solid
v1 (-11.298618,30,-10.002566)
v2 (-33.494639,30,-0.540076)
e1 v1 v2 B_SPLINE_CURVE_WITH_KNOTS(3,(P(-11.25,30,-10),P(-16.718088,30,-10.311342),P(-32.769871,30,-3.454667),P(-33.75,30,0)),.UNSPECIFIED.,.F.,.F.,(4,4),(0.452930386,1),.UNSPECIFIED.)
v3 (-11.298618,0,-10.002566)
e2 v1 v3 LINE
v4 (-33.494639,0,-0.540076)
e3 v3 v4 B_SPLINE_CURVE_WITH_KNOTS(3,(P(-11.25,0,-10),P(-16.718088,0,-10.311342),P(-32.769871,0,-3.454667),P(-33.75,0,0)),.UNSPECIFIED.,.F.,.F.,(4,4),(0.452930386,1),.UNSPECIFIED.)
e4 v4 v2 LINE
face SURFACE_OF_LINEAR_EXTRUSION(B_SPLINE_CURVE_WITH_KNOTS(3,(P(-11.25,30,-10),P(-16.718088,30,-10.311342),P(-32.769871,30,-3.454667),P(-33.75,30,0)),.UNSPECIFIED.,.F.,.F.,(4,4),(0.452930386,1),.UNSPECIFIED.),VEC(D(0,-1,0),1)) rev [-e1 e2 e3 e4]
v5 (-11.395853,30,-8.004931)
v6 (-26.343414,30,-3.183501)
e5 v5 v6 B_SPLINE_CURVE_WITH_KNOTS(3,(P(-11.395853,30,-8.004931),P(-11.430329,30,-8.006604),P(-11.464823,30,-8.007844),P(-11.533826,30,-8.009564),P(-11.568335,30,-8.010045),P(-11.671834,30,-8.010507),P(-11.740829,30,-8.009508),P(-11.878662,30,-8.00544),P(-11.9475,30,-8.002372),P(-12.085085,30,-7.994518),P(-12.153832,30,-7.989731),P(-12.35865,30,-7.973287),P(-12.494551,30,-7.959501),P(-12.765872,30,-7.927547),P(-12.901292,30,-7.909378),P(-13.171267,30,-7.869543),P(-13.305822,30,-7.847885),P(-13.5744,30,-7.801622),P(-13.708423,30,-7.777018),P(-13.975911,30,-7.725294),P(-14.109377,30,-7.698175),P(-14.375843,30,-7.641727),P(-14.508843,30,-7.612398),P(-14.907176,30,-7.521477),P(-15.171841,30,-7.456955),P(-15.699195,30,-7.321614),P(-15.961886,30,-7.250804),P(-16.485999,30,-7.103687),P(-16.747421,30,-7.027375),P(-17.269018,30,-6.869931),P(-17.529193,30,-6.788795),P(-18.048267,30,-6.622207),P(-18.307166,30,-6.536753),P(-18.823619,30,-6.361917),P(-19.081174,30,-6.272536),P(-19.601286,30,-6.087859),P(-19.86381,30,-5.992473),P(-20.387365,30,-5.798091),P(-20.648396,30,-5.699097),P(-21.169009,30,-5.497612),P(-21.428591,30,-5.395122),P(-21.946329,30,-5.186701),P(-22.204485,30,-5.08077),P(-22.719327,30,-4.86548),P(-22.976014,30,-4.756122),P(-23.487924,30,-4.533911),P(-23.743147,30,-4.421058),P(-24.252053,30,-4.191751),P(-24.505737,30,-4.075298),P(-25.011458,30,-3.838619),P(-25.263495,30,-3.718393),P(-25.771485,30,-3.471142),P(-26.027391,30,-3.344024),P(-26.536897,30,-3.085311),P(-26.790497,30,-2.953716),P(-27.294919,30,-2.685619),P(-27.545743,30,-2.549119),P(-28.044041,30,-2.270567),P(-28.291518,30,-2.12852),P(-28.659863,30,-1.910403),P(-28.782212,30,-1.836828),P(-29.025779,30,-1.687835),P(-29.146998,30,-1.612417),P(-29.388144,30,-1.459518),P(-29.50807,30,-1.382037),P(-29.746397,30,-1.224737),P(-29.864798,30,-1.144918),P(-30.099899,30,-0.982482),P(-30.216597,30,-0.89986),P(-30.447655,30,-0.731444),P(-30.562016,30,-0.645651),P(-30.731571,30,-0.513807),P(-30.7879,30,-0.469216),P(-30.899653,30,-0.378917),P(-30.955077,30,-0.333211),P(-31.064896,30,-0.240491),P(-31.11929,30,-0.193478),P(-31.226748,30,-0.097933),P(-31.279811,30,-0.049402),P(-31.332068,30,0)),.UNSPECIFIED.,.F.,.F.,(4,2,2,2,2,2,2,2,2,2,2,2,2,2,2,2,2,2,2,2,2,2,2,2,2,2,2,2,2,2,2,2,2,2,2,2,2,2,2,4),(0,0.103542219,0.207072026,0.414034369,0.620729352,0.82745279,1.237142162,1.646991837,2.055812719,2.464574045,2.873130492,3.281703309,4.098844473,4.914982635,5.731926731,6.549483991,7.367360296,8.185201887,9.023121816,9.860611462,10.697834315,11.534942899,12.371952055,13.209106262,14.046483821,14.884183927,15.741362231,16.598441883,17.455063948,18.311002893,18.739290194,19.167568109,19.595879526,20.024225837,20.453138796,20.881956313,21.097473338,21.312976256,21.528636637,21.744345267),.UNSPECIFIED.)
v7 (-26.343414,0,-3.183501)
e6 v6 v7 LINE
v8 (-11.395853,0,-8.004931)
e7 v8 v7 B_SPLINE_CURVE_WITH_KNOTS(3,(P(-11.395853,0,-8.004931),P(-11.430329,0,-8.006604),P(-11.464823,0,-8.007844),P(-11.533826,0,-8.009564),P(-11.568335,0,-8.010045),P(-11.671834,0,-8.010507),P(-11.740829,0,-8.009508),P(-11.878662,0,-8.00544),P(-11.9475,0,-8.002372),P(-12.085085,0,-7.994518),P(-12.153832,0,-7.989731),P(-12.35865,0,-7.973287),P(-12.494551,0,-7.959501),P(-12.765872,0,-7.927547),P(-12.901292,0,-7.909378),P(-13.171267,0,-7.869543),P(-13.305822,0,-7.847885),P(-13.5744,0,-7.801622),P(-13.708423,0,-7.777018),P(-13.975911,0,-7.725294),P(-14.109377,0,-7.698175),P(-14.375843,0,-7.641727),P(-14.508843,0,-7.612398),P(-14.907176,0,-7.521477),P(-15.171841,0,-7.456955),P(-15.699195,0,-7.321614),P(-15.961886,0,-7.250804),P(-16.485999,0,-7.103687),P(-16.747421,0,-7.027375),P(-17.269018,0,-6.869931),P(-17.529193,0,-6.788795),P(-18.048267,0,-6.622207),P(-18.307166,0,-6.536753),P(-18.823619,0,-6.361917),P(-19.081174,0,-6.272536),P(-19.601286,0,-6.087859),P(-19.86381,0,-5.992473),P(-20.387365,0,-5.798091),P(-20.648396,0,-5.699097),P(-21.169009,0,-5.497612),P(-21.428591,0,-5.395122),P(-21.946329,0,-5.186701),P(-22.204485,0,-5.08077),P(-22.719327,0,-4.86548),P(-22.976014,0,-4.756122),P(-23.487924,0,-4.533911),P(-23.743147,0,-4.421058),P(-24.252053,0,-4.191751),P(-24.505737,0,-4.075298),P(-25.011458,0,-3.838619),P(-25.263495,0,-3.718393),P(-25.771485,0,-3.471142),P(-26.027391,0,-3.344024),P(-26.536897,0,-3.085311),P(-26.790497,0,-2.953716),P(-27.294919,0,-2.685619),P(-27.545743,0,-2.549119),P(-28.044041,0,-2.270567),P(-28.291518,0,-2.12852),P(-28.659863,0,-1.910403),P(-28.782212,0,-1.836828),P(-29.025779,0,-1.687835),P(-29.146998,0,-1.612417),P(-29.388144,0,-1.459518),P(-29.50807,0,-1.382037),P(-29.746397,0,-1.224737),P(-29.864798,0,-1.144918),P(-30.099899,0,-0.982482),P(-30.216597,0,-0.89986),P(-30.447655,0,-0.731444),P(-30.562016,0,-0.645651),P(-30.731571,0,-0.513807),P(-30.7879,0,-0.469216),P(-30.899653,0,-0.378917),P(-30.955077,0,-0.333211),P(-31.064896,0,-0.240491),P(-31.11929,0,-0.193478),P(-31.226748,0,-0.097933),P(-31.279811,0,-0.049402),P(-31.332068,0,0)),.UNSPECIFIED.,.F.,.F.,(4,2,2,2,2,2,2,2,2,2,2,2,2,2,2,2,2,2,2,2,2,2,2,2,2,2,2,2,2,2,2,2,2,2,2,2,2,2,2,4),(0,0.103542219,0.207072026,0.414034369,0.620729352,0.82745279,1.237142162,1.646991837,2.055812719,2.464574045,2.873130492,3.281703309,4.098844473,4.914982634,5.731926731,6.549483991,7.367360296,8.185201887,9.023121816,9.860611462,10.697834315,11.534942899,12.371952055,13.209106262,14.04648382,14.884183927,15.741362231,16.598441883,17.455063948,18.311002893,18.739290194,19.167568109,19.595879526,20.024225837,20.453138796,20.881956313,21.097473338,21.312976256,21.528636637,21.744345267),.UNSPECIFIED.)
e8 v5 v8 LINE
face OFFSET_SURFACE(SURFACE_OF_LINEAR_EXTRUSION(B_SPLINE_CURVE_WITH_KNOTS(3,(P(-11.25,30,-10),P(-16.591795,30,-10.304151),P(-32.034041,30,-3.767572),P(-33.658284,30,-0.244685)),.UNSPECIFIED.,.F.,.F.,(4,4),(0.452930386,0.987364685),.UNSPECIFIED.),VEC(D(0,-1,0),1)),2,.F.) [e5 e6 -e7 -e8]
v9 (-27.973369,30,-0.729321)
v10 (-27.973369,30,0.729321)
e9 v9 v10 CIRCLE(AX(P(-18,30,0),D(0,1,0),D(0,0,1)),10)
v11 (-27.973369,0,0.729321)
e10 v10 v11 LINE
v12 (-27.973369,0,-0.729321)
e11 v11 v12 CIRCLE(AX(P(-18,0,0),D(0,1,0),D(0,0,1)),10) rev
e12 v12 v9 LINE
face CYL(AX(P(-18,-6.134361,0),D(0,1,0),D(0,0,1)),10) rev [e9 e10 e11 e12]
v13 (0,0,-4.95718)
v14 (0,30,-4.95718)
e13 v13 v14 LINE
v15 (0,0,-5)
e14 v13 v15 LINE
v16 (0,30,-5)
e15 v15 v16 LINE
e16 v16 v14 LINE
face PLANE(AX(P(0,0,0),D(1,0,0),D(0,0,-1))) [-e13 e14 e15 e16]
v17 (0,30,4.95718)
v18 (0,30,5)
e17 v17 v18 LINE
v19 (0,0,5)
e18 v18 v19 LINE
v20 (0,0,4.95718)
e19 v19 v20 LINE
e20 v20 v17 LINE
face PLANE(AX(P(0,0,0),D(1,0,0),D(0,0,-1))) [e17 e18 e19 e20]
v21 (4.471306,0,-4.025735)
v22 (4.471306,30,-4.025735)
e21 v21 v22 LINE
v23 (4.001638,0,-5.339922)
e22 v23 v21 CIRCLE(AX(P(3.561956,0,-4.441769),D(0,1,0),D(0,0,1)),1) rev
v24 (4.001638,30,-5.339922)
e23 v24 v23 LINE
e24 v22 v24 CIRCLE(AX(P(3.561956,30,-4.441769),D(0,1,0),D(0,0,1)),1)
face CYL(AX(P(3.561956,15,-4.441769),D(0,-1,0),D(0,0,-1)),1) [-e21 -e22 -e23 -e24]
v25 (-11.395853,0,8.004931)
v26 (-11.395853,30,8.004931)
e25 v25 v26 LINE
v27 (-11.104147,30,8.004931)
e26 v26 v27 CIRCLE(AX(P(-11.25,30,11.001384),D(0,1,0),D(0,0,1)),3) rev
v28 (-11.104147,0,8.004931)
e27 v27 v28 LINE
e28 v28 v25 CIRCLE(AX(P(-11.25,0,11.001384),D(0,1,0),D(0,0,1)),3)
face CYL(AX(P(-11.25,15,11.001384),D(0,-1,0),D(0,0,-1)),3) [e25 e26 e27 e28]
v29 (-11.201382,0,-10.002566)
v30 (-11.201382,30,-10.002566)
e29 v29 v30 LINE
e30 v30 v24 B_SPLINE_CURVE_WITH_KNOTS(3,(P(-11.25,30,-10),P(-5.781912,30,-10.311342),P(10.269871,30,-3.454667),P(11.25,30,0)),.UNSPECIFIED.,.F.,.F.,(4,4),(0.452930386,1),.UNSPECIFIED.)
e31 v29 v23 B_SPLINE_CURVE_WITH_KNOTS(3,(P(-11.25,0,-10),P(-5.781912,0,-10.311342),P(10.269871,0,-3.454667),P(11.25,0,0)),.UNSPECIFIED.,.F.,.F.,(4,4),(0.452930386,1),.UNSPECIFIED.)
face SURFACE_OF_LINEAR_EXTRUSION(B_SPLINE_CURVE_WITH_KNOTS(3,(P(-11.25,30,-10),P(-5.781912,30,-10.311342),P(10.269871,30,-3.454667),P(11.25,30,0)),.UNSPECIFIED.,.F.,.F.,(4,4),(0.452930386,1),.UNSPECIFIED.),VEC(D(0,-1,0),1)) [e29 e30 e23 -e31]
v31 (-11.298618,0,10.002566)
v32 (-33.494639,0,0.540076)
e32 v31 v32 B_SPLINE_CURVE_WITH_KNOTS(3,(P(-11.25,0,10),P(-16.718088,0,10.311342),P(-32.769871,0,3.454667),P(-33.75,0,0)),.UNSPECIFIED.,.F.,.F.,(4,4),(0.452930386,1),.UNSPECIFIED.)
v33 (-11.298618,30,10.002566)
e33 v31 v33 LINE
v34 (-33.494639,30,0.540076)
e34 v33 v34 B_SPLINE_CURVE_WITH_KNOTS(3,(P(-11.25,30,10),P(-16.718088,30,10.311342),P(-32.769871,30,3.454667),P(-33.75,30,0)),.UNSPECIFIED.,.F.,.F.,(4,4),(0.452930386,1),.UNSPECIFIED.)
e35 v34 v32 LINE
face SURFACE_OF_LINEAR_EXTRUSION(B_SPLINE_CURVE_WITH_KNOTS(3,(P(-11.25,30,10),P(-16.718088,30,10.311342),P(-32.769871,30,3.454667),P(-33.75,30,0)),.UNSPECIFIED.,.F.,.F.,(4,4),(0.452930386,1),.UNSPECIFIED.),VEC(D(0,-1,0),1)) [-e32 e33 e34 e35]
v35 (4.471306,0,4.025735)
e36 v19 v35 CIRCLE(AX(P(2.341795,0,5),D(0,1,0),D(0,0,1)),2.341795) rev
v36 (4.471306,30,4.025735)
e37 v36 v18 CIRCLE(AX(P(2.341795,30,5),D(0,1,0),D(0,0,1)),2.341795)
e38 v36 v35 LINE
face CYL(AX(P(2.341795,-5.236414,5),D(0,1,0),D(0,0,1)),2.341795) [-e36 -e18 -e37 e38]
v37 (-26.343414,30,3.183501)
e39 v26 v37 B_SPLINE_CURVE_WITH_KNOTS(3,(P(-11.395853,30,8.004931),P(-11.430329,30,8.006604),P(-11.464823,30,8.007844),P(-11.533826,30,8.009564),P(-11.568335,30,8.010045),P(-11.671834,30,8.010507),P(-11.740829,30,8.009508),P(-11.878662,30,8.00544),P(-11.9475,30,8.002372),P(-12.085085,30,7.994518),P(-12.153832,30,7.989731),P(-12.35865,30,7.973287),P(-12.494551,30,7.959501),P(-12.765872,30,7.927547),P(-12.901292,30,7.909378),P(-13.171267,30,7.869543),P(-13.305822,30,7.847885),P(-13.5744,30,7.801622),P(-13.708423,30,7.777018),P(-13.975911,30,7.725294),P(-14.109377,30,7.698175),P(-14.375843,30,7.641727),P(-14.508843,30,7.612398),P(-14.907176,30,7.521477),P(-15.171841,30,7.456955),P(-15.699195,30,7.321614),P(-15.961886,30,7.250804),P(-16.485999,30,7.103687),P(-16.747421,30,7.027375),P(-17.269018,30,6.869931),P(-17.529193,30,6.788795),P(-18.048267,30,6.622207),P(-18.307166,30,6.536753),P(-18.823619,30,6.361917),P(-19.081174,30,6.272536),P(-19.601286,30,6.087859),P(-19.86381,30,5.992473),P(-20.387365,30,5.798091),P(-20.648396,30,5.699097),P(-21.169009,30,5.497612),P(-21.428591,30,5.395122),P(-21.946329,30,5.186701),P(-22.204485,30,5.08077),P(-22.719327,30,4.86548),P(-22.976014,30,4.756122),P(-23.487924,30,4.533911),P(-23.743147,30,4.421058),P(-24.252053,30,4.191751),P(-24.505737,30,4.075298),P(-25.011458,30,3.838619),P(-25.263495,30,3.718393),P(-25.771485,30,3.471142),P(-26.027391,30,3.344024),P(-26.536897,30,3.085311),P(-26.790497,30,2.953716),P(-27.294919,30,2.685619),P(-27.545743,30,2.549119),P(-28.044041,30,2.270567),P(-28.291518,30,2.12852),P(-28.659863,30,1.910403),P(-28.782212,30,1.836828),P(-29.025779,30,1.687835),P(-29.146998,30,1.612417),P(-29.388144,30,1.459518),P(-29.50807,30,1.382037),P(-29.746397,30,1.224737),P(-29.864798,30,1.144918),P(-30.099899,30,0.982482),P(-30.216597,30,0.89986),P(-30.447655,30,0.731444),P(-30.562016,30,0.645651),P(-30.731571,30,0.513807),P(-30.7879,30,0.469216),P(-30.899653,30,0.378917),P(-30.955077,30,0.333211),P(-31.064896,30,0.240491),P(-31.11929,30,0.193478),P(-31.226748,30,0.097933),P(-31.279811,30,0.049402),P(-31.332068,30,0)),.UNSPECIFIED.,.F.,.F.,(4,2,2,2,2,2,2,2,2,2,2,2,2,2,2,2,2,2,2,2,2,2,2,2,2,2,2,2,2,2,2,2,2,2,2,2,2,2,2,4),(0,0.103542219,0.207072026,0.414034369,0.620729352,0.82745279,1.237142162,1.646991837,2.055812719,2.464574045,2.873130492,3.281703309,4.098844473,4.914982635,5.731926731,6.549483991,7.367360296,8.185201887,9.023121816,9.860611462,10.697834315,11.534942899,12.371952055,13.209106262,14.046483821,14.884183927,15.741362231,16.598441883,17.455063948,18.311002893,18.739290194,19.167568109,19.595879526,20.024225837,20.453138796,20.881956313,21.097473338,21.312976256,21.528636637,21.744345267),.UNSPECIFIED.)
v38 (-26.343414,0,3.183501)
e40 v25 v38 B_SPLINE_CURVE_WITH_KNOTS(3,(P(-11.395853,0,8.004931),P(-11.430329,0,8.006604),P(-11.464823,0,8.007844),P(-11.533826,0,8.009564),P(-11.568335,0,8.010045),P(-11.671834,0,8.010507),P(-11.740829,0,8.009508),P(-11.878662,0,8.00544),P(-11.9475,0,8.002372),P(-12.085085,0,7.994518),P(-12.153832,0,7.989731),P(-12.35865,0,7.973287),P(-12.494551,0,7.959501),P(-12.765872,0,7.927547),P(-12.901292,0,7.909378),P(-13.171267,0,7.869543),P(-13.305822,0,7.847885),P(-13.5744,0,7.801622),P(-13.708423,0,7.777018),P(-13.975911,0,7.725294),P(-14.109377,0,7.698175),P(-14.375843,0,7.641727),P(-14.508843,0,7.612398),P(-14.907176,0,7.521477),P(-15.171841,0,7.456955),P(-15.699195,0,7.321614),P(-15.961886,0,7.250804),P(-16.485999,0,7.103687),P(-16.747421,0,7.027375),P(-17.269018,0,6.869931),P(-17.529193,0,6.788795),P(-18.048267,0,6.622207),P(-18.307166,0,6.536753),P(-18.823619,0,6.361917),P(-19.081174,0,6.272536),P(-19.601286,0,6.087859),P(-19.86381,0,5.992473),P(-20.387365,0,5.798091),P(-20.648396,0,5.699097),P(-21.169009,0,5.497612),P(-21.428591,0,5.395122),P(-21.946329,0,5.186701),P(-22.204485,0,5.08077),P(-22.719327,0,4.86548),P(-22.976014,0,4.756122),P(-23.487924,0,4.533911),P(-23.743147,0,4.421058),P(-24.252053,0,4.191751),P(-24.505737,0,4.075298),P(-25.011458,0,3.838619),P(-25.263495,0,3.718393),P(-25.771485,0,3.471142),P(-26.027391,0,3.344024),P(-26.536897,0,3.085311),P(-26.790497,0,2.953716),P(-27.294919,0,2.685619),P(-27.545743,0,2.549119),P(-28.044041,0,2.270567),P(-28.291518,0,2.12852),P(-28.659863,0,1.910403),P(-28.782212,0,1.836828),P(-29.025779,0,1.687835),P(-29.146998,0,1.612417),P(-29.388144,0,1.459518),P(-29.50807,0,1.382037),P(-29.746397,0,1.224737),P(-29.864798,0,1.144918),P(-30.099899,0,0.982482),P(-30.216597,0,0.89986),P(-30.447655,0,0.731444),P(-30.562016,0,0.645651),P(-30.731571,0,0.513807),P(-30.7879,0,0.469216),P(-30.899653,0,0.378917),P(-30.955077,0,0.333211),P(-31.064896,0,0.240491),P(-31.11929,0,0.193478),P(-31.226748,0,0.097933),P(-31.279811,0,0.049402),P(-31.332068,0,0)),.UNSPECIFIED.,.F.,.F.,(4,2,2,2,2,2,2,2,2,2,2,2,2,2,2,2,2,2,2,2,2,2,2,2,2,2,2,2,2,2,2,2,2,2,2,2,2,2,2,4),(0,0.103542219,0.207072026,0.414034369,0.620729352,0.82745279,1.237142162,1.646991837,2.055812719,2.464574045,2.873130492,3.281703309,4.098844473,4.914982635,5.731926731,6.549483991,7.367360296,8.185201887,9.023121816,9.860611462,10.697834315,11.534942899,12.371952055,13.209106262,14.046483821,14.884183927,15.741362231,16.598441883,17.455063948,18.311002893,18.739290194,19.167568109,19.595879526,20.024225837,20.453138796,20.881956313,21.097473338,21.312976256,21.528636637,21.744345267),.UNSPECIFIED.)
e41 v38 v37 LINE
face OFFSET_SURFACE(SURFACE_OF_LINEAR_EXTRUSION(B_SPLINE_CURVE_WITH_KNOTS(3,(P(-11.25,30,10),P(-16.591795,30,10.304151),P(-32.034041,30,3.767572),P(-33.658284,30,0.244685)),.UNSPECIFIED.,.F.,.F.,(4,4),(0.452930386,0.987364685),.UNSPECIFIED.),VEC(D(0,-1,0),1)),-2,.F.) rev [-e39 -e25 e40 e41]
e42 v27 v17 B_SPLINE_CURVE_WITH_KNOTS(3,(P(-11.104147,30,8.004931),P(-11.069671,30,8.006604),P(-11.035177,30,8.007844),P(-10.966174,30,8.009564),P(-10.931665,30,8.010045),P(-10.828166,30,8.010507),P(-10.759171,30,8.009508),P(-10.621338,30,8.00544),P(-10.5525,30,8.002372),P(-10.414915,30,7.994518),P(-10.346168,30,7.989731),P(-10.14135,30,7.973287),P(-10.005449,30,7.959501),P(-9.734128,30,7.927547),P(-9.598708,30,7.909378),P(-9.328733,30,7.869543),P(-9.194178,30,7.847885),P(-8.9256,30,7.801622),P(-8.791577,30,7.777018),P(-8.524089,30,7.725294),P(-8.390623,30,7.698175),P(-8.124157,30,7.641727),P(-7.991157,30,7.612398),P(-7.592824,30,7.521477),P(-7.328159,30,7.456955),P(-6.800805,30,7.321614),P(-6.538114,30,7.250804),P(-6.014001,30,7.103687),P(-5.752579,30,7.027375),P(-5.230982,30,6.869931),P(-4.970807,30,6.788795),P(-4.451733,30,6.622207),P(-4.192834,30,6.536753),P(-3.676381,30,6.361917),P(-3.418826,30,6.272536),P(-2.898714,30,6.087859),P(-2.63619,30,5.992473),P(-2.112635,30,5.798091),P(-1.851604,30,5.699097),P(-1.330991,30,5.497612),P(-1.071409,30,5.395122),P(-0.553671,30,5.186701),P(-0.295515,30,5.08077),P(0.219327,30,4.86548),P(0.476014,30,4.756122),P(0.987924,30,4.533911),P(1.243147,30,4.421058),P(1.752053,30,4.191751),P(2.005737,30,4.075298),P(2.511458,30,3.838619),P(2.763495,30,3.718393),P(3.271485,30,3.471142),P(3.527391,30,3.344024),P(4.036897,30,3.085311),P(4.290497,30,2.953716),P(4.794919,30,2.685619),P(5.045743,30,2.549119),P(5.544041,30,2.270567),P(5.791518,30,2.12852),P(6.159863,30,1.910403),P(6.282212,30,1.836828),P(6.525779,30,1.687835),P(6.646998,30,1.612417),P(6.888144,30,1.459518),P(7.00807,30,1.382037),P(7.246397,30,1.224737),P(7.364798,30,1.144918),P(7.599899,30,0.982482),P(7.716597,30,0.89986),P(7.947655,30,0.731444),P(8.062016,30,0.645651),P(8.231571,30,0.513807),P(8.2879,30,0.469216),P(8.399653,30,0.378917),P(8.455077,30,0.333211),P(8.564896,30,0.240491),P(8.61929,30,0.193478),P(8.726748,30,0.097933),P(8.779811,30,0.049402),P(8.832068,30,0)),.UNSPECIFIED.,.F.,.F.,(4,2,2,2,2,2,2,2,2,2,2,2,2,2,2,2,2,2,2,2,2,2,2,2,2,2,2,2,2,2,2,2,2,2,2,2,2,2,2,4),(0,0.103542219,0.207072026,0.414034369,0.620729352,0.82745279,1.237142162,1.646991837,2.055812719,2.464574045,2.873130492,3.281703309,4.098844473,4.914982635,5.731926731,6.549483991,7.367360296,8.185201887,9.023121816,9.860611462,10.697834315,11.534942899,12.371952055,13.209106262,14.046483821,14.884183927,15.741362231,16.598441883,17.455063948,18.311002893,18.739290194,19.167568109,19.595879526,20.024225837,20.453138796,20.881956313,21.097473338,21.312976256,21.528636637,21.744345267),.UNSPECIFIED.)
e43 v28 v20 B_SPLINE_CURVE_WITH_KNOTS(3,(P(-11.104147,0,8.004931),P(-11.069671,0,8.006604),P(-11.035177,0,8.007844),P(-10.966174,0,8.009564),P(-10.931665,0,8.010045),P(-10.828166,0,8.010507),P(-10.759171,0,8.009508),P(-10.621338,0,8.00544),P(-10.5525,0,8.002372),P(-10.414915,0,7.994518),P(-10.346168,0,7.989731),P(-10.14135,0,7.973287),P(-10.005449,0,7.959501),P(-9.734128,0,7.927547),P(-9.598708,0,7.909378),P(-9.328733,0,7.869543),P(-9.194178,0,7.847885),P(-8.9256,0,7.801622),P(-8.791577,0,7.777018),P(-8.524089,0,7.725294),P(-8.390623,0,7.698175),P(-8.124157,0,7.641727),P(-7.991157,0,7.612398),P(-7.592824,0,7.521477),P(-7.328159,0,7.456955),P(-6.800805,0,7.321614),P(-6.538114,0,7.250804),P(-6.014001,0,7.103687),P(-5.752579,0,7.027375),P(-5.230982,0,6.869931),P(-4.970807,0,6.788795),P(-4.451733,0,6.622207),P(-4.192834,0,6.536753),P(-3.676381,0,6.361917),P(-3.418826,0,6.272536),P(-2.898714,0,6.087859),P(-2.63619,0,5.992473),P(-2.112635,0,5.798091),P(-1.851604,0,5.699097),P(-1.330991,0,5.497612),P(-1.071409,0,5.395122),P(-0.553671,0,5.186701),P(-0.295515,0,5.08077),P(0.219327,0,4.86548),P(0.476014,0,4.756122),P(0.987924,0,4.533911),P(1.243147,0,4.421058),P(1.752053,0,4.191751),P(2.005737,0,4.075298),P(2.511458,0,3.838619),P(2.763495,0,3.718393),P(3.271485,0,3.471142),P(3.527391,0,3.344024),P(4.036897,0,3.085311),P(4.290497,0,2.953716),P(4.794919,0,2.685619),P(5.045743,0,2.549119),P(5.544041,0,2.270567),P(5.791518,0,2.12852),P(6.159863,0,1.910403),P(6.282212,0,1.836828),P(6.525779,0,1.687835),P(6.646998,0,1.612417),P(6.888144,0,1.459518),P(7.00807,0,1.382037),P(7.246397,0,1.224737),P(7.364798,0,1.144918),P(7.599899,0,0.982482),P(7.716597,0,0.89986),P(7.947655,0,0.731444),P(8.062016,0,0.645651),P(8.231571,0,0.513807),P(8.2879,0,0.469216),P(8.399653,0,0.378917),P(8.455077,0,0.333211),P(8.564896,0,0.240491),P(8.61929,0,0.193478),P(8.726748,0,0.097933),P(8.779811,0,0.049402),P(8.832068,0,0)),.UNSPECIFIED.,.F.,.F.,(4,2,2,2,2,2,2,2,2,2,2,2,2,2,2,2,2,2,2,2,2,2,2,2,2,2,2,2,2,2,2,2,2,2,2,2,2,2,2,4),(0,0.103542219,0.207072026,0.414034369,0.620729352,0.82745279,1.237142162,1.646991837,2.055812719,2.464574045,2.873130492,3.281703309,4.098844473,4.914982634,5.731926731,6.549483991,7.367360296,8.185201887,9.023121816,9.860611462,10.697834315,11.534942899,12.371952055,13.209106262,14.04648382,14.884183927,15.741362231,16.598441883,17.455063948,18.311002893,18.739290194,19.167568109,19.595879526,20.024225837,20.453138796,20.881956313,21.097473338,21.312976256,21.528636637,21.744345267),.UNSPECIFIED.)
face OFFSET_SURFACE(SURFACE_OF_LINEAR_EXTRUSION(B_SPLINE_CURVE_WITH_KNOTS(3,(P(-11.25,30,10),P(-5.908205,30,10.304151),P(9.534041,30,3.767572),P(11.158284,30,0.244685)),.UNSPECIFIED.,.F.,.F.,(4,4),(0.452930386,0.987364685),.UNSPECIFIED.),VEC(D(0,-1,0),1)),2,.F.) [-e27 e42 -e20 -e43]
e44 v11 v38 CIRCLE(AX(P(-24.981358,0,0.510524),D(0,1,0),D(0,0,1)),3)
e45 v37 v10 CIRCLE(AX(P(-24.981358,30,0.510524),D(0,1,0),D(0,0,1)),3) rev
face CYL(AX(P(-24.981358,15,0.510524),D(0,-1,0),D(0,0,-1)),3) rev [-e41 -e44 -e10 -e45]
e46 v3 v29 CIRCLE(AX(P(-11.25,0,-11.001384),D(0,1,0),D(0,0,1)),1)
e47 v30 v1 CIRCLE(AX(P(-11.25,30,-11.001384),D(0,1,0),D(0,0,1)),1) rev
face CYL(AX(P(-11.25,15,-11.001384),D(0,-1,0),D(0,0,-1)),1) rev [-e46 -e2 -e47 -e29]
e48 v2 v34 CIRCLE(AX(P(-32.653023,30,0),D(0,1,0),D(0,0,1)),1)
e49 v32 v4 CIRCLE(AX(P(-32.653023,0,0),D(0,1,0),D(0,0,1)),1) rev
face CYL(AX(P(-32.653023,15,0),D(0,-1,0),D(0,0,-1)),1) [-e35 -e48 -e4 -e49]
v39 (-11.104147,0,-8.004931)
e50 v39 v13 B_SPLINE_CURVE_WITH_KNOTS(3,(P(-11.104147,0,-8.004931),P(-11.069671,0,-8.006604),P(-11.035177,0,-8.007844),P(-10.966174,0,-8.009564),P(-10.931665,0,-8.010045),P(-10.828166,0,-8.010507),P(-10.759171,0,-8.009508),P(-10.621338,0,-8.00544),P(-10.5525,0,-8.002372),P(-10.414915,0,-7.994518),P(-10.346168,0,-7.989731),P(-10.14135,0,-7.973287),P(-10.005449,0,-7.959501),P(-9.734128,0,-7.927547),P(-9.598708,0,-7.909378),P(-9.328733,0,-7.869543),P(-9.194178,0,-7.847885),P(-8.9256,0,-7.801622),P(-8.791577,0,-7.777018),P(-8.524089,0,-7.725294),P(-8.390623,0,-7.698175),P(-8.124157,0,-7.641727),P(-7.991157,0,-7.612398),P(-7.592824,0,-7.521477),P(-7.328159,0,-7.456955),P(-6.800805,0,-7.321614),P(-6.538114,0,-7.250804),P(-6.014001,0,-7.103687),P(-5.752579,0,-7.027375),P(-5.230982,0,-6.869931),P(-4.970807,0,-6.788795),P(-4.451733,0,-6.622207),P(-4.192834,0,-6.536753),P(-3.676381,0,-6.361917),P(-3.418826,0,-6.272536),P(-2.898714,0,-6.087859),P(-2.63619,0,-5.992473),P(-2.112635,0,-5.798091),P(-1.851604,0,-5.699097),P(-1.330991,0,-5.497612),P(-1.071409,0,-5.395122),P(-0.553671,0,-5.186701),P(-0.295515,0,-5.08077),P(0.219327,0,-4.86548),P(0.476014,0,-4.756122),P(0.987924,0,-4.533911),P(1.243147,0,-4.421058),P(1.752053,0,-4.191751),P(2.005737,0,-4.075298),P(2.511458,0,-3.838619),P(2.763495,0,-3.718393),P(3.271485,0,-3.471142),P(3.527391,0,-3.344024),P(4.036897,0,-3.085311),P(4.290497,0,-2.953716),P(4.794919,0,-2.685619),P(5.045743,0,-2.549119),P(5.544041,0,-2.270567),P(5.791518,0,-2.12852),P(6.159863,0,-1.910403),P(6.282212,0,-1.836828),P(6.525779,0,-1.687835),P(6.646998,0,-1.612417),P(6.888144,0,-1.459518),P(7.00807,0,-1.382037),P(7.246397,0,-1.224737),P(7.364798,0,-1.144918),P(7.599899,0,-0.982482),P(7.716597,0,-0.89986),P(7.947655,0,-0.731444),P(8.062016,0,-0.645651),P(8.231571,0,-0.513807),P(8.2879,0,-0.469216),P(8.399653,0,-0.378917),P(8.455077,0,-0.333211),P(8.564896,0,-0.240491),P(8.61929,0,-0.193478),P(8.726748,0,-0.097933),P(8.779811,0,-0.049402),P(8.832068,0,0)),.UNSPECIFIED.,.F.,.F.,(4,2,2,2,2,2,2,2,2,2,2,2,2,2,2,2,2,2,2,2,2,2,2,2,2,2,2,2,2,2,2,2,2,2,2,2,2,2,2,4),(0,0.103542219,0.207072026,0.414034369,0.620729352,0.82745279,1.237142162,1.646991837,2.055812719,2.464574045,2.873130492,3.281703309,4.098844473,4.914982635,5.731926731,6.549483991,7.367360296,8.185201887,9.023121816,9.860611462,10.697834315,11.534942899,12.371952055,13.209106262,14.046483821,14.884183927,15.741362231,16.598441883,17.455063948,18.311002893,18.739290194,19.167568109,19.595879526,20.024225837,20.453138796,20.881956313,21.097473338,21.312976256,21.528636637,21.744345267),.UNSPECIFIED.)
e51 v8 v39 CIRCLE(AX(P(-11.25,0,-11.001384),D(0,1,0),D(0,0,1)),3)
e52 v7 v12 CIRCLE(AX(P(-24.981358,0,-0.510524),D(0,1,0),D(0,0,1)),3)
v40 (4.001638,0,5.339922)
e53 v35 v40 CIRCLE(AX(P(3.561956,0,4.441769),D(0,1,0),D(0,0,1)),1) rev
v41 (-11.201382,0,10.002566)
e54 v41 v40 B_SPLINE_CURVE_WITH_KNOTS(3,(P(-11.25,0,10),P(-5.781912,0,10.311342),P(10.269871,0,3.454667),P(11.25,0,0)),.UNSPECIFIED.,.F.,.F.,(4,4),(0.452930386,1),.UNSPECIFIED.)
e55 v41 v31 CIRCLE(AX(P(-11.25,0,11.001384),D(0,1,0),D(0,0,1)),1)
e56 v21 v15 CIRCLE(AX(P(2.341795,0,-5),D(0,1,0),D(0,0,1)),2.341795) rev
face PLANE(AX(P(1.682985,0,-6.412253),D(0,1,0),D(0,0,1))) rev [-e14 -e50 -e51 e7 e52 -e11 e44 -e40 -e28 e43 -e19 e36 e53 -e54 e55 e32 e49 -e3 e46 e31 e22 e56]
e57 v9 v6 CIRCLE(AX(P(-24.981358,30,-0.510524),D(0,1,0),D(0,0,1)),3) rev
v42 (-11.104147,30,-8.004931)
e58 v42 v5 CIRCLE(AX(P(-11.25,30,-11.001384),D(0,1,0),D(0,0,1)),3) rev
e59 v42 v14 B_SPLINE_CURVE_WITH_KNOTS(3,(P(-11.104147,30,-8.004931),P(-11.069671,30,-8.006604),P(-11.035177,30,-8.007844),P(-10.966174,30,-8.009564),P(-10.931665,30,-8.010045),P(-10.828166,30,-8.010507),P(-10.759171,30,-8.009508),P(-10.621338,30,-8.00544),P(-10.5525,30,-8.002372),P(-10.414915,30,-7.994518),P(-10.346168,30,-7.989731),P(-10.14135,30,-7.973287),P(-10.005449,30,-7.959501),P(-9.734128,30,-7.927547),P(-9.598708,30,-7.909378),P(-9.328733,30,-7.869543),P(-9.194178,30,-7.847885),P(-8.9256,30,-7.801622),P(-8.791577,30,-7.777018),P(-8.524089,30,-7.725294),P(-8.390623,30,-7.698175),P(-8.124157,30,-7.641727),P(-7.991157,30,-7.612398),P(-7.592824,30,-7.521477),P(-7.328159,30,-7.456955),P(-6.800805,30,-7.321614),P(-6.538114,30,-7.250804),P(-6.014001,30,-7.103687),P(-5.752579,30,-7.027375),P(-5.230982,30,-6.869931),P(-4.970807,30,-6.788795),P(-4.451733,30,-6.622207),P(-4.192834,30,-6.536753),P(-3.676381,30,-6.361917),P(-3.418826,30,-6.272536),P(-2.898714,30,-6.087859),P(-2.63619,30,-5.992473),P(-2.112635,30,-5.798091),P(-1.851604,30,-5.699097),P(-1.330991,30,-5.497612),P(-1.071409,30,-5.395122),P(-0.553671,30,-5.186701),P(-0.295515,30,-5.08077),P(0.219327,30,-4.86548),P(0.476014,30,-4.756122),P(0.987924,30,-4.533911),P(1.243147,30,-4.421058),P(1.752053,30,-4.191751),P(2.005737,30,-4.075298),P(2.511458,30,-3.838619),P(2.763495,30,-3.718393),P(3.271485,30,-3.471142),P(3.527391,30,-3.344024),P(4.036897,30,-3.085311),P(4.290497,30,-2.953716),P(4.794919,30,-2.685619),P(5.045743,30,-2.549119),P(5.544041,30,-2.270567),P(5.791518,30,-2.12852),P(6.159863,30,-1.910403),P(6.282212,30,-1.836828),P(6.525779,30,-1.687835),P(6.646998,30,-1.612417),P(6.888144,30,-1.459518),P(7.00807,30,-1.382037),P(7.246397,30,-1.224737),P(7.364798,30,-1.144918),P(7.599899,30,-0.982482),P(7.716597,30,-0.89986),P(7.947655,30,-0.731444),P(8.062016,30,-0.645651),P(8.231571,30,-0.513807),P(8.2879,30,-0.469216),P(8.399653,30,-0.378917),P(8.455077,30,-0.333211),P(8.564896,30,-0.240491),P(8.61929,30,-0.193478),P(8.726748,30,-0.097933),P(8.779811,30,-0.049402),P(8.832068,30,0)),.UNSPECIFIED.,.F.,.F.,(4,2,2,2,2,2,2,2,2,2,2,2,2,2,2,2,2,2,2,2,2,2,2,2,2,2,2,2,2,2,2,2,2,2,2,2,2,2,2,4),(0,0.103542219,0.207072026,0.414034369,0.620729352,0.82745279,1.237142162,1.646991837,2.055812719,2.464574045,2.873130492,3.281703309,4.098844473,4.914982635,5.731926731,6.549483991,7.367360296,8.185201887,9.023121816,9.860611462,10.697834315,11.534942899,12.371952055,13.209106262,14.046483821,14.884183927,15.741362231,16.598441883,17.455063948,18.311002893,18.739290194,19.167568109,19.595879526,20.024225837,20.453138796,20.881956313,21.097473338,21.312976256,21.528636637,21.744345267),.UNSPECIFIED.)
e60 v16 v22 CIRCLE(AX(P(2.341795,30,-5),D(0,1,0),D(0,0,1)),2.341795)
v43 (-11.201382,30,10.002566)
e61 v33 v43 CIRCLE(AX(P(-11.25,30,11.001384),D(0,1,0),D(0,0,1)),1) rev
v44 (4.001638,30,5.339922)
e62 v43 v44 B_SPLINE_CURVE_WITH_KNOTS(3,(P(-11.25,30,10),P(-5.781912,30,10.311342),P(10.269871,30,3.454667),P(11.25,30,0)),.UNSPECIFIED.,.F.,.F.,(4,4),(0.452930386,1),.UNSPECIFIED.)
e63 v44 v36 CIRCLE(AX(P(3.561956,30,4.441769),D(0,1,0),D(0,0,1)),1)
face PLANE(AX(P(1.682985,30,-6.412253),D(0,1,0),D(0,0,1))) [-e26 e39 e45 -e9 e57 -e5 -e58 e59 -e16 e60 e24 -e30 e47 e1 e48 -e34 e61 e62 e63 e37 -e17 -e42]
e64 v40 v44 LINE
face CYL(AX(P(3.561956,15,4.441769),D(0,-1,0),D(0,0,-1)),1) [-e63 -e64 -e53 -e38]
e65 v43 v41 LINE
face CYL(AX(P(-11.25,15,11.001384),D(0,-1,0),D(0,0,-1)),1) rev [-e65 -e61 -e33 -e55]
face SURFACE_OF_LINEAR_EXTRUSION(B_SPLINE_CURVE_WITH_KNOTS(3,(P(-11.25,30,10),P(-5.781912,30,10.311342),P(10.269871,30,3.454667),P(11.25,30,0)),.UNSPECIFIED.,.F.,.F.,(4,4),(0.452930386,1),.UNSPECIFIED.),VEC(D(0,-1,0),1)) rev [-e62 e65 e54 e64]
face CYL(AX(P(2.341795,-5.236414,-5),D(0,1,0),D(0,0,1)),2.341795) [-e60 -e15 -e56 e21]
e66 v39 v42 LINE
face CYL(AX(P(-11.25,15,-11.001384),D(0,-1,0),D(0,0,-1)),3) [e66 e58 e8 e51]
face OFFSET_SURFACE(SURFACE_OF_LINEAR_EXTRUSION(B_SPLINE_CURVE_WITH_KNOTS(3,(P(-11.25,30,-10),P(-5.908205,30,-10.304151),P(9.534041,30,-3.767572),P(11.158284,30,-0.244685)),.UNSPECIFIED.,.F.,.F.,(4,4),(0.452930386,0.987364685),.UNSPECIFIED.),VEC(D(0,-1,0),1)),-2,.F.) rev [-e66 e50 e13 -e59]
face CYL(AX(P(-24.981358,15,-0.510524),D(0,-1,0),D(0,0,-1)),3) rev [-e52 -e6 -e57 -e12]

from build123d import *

# Parameters (mm, degrees)
BOSS_EXTRUDE1_DEPTH = 30
FILLET1_R           = 1
SHELL1_T            = -2
CUT_EXTRUDE1_REACH  = 48.182
SKETCH3_W           = 10
SKETCH3_H           = 30
BOSS_EXTRUDE2_DEPTH = 30
BOSS_EXTRUDE4_START = -30
BOSS_EXTRUDE4_DEPTH = 30
FILLET2_R           = 3
FILLET3_R           = 1


# Read off the part's stored shape, not the designer's step: Boss-Extrude4
with BuildPart() as part:
    # Sketch1 → Boss-Extrude1 (new body)
    with BuildSketch(Plane(origin=(0, 0, 0), x_dir=(1, 0, 0), z_dir=(0, 1, 0))):
        with BuildLine():
            add(Edge.make_bspline(
                [(-11.25, 10), (-5.781911856, 10.311342007), (10.269870792, 3.454667183), (11.25, 0)],
                knots=[0.452930386, 0.452930386, 0.452930386, 0.452930386, 1, 1, 1, 1], degree=3))
            add(Edge.make_bspline(
                [(-11.25, -10), (-5.781911856, -10.311342007), (10.269870792, -3.454667183), (11.25, 0)],
                knots=[0.452930386, 0.452930386, 0.452930386, 0.452930386, 1, 1, 1, 1], degree=3))
            add(Edge.make_bspline(
                [(-11.25, -10), (-16.718088144, -10.311342007), (-32.769870792, -3.454667183), (-33.75, 0)],
                knots=[0.452930386, 0.452930386, 0.452930386, 0.452930386, 1, 1, 1, 1], degree=3))
            add(Edge.make_bspline(
                [(-11.25, 10), (-16.718088144, 10.311342007), (-32.769870792, 3.454667183), (-33.75, 0)],
                knots=[0.452930386, 0.452930386, 0.452930386, 0.452930386, 1, 1, 1, 1], degree=3))
        make_face()
    extrude(amount=BOSS_EXTRUDE1_DEPTH)

    # Fillet1
    fillet1_edges = [part.edges().sort_by_distance(p)[0] for p in [
        (-33.75, 15, 0),
        (-11.25, 15, -10),
        (11.25, 15, 0),
        (-11.25, 15, 10),
    ]]
    fillet(fillet1_edges, radius=FILLET1_R)

    # Shell1
    shell1_openings = [part.faces().sort_by_distance(p)[0] for p in [
        (-11.25, 30, 0),
        (-11.25, 0, 0),
    ]]
    offset(amount=SHELL1_T, openings=shell1_openings)

    # Sketch3 → Cut-Extrude1 (cut, up to next)
    with BuildSketch(Plane(origin=(0, 0, 0), x_dir=(0, 0, -1), z_dir=(1, 0, 0)), mode=Mode.PRIVATE) as cut_extrude1_sk1:
        with Locations((0, 15)):
            Rectangle(SKETCH3_W, SKETCH3_H)
    cut_extrude1_tool1 = extrude(cut_extrude1_sk1.sketch, amount=CUT_EXTRUDE1_REACH, mode=Mode.PRIVATE) & part.part
    add(cut_extrude1_tool1.solids().sort_by_distance((0, 15, 0))[0], mode=Mode.SUBTRACT)

    # Sketch4 → Boss-Extrude2 (add)
    with BuildSketch(Plane(origin=(0, 30, 0), x_dir=(1, 0, 0), z_dir=(0, 1, 0))):
        with BuildLine():
            Line((4.683590917, 5), (0, 5))
            ThreePointArc((0, 5), (2.341795458, 2.658204542), (4.683590917, 5))
        make_face()
        with BuildLine():
            Line((0, -5), (4.683590917, -5))
            ThreePointArc((4.683590917, -5), (2.341795458, -2.658204542), (0, -5))
        make_face()
    extrude(amount=-BOSS_EXTRUDE2_DEPTH)

    # Boss-Extrude4 outline → Boss-Extrude4 (add)
    with BuildSketch(Plane(origin=(0, 30, 0), x_dir=(1, 0, 0), z_dir=(0, 1, 0)).offset(BOSS_EXTRUDE4_START)):
        with BuildLine():
            ThreePointArc((-27.69069648, -2.46787393), (-28, 0), (-27.69069648, 2.46787393))
            add(Edge.make_bspline(
                [(-27.69069648, 2.46787393), (-27.822031215, 2.39499699), (-27.951900256, 2.322199534), (-28.080260991, 2.249502833), (-28.20707038, 2.176928557), (-28.332284982, 2.10449893), (-28.455860917, 2.032236786), (-28.57775383, 1.960165641), (-28.697918846, 1.88830977), (-28.816310527, 1.816694288), (-28.932882823, 1.745345254), (-29.047589016, 1.674289767), (-29.395924825, 1.455844025), (-29.623125506, 1.309538219), (-29.841540019, 1.164885503), (-30.050742717, 1.022190072), (-30.250257196, 0.881746107), (-30.439599681, 0.743903891), (-30.618272334, 0.609068339), (-30.785746265, 0.477701019), (-30.941461201, 0.350349869), (-31.084828141, 0.227682248), (-31.21523231, 0.110536702), (-31.332067668, -2.7e-08)],
                knots=[0.816861964, 0.816861964, 0.816861964, 0.816861964, 0.816861964, 0.816861964, 0.816861964, 0.816861964, 0.816861964, 0.816861964, 0.816861964, 0.816861964, 0.816861964, 0.853756111, 0.853756111, 0.853756111, 0.853756111, 0.853756111, 0.853756111, 0.853756111, 0.853756111, 0.853756111, 0.853756111, 0.853756111, 0.930801589, 0.930801589, 0.930801589, 0.930801589, 0.930801589, 0.930801589, 0.930801589, 0.930801589, 0.930801589, 0.930801589, 0.930801589, 0.930801589, 0.930801589], degree=12))
            add(Edge.make_bspline(
                [(-27.69069648, -2.46787393), (-27.822031215, -2.39499699), (-27.951900256, -2.322199534), (-28.080260991, -2.249502833), (-28.20707038, -2.176928557), (-28.332284982, -2.10449893), (-28.455860917, -2.032236786), (-28.57775383, -1.960165641), (-28.697918846, -1.88830977), (-28.816310527, -1.816694288), (-28.932882823, -1.745345254), (-29.047589016, -1.674289767), (-29.395924825, -1.455844025), (-29.623125506, -1.309538219), (-29.841540019, -1.164885503), (-30.050742717, -1.022190072), (-30.250257196, -0.881746107), (-30.439599681, -0.743903891), (-30.618272334, -0.609068339), (-30.785746265, -0.477701019), (-30.941461201, -0.350349869), (-31.084828141, -0.227682248), (-31.21523231, -0.110536702), (-31.332067668, -2.7e-08)],
                knots=[0.816861964, 0.816861964, 0.816861964, 0.816861964, 0.816861964, 0.816861964, 0.816861964, 0.816861964, 0.816861964, 0.816861964, 0.816861964, 0.816861964, 0.816861964, 0.853756111, 0.853756111, 0.853756111, 0.853756111, 0.853756111, 0.853756111, 0.853756111, 0.853756111, 0.853756111, 0.853756111, 0.853756111, 0.930801589, 0.930801589, 0.930801589, 0.930801589, 0.930801589, 0.930801589, 0.930801589, 0.930801589, 0.930801589, 0.930801589, 0.930801589, 0.930801589, 0.930801589], degree=12))
        make_face()
    extrude(amount=BOSS_EXTRUDE4_DEPTH)

    # Fillet2
    fillet2_edges = [part.edges().sort_by_distance(p)[0] for p in [
        (-27.69069648, 15, 2.46787393),
        (-27.69069648, 15, -2.46787393),
    ]]
    fillet(fillet2_edges, radius=FILLET2_R)

    # Fillet3
    fillet3_edges = [part.edges().sort_by_distance(p)[0] for p in [
        (4.683590936, 15, -5),
        (4.683590936, 15, 5),
    ]]
    fillet(fillet3_edges, radius=FILLET3_R)


solid = part.part
